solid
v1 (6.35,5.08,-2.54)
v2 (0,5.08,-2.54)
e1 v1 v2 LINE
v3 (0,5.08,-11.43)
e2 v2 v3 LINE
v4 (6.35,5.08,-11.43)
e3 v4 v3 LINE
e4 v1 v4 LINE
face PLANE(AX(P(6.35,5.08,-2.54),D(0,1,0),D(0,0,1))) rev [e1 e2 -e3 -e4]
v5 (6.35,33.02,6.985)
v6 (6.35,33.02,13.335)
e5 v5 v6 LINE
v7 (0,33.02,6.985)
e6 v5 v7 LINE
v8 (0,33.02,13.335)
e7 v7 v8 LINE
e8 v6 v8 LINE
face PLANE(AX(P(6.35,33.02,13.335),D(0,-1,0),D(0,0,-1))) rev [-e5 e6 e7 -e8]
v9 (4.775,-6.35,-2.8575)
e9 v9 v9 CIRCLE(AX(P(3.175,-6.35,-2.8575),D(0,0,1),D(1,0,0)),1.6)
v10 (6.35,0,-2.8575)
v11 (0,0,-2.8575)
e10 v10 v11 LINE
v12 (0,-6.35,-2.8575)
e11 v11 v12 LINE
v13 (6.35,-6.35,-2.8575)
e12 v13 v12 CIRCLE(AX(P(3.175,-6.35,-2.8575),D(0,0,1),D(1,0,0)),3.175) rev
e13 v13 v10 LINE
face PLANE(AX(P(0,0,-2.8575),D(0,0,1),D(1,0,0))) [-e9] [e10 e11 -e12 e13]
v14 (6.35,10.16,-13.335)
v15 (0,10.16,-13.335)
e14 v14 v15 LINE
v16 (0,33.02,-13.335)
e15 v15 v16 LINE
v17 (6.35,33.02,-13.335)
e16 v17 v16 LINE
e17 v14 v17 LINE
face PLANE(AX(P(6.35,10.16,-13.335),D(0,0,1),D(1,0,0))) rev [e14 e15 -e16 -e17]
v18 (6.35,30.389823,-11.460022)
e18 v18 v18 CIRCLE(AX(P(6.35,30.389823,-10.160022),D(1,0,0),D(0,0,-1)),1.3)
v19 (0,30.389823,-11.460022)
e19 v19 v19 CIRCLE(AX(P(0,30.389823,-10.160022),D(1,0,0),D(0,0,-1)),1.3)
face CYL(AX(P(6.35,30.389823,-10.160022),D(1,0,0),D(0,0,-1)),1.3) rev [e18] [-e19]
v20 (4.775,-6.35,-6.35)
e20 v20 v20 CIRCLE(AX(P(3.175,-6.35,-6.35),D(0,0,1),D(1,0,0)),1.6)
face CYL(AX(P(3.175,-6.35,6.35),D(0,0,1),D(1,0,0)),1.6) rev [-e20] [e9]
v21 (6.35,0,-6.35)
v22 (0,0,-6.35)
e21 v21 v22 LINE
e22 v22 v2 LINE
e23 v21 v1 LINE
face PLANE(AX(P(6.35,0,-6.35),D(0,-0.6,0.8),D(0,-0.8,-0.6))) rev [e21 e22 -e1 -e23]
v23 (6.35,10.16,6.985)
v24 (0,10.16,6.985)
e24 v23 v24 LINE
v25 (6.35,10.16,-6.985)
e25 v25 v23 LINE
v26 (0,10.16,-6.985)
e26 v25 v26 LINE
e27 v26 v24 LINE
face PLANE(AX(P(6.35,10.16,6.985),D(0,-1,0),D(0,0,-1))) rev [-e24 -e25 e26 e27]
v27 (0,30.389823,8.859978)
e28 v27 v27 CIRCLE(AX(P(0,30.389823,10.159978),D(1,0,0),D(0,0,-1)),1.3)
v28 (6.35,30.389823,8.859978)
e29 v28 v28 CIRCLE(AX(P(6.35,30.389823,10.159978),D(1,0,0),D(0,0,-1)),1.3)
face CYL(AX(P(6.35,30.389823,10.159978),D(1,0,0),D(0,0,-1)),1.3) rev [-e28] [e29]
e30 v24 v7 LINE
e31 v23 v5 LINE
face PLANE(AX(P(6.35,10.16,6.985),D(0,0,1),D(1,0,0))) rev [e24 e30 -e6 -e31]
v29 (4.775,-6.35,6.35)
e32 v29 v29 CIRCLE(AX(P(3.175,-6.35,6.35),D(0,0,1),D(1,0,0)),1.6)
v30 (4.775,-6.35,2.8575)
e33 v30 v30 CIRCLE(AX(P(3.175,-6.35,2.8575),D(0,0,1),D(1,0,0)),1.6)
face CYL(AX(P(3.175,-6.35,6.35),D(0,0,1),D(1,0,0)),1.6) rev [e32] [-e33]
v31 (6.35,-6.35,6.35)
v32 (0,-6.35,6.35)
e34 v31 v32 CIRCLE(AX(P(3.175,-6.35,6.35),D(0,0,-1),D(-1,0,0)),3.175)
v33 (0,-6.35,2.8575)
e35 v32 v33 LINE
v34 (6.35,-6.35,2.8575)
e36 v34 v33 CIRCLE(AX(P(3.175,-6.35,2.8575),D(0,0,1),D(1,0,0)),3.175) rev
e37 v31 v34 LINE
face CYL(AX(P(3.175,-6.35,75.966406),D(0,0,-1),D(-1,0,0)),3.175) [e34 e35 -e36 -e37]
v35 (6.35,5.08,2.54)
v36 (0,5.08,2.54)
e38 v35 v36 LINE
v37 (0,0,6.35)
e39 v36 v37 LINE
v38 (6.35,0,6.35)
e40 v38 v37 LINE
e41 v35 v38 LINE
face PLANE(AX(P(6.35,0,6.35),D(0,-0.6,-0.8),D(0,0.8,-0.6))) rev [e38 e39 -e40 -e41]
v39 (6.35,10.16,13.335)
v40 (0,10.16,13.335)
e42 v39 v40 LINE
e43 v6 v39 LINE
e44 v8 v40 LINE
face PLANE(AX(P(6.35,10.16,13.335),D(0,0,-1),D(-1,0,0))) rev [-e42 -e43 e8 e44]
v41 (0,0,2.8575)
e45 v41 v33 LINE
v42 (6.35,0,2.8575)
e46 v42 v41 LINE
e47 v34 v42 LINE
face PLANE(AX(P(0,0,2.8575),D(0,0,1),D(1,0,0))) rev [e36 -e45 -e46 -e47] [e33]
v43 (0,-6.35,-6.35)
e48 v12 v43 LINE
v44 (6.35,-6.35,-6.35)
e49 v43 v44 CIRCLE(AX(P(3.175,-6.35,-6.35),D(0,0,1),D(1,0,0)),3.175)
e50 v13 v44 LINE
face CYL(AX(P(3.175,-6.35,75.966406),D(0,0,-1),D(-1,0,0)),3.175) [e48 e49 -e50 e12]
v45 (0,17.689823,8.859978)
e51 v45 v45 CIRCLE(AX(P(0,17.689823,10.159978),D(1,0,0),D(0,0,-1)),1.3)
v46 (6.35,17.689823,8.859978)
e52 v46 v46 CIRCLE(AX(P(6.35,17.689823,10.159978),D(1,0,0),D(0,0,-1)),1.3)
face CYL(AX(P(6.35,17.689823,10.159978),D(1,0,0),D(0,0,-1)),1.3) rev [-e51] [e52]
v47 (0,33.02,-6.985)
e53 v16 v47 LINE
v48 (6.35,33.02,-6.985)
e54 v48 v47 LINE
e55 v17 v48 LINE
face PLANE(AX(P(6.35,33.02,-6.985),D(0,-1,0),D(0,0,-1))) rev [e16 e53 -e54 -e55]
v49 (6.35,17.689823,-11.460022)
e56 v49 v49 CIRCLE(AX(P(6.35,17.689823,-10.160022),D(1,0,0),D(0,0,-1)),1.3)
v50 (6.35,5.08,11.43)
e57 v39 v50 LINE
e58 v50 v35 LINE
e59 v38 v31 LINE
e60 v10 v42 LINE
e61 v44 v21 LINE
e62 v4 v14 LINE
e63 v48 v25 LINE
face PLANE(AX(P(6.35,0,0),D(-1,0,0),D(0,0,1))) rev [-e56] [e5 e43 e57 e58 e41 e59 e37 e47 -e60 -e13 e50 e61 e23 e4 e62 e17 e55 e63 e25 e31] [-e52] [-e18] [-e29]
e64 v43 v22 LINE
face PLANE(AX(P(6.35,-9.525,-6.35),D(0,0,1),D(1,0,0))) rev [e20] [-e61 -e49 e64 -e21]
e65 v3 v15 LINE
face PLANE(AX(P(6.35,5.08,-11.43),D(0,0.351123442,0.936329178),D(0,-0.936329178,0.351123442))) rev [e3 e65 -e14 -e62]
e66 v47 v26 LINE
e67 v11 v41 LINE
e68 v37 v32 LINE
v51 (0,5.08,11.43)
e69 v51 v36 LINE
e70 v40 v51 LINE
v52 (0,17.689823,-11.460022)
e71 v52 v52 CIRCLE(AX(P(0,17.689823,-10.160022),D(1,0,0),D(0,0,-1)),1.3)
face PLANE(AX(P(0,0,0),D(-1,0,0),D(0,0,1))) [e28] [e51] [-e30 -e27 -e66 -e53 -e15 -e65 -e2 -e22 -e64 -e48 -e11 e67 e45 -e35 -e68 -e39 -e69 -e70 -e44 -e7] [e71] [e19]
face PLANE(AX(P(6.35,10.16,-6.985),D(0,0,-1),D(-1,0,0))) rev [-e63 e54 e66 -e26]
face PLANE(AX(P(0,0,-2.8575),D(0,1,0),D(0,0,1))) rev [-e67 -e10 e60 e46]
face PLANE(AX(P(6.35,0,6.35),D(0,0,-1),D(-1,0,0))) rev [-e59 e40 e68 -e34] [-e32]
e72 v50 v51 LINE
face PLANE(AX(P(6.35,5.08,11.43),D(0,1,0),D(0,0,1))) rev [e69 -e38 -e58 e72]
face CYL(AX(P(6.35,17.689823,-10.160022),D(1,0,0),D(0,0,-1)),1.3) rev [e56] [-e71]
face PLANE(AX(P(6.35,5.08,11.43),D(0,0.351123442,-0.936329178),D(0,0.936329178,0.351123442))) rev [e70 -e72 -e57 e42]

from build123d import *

# Parameters (mm, degrees)
BOSS_EXTRUDE2_DEPTH  = 6.35
CUT_EXTRUDE1_START   = -12.7
CUT_EXTRUDE1_DEPTH   = 12.7
SKETCH17_W           = 6.35
SKETCH17_H           = 9.525
CUT_EXTRUDE2_DEPTH   = 2.8575
M2_CLEARANCE_HOLE1_D = 2.6
M3_CLEARANCE_HOLE1_D = 3.2


with BuildPart() as part:
    # Sketch5 → Boss-Extrude2 (new body)
    with BuildSketch(Plane(origin=(0, 0, 0), x_dir=(0, 0, -1), z_dir=(1, 0, 0))):
        Polygon((-11.43, 5.08), (-2.54, 5.08), (-6.35, 0), (-6.35, -9.525), (6.35, -9.525), (6.35, 0), (2.54, 5.08), (11.43, 5.08), (13.335, 10.16), (13.335, 33.02), (6.985, 33.02), (6.985, 10.16), (-6.985, 10.16), (-6.985, 33.02), (-13.335, 33.02), (-13.335, 10.16), align=None)
    extrude(amount=BOSS_EXTRUDE2_DEPTH)

    # Cut-Extrude1: read off the stored shape, not the designer's step
    # Cut-Extrude1 outline → Cut-Extrude1 (cut)
    with BuildSketch(Plane.XY.offset(6.35).offset(CUT_EXTRUDE1_START)):
        with BuildLine():
            Line((6.35, -9.525), (6.35, -6.35))
            ThreePointArc((6.35, -6.35), (5.42006403, -8.59506403), (3.175, -9.525))
            Line((3.175, -9.525), (6.35, -9.525))
        make_face()
        with BuildLine():
            Line((0, -9.525), (3.175, -9.525))
            ThreePointArc((3.175, -9.525), (0.92993597, -8.59506403), (0, -6.35))
            Line((0, -6.35), (0, -9.525))
        make_face()
    extrude(amount=CUT_EXTRUDE1_DEPTH, mode=Mode.SUBTRACT)

    # Sketch17 → Cut-Extrude2 (cut, symmetric)
    with BuildSketch(Plane.XY):
        with Locations((3.175, -4.7625)):
            Rectangle(SKETCH17_W, SKETCH17_H)
    extrude(amount=CUT_EXTRUDE2_DEPTH, both=True, mode=Mode.SUBTRACT)

    # M2 Clearance Hole1 (through all)
    with Locations(Plane(origin=(6.35, 0, 0), x_dir=(0, 0, -1), z_dir=(1, 0, 0))):
        with Locations((-10.159977629, 17.689823395), (-10.159977629, 30.389823395), (10.160022371, 30.389823395), (10.160022371, 17.689823395)):
            Hole(M2_CLEARANCE_HOLE1_D / 2)

    # M3 Clearance Hole1 (through all)
    with Locations(Plane.XY.offset(6.35)):
        with Locations((3.175, -6.35)):
            Hole(M3_CLEARANCE_HOLE1_D / 2)


solid = part.part
